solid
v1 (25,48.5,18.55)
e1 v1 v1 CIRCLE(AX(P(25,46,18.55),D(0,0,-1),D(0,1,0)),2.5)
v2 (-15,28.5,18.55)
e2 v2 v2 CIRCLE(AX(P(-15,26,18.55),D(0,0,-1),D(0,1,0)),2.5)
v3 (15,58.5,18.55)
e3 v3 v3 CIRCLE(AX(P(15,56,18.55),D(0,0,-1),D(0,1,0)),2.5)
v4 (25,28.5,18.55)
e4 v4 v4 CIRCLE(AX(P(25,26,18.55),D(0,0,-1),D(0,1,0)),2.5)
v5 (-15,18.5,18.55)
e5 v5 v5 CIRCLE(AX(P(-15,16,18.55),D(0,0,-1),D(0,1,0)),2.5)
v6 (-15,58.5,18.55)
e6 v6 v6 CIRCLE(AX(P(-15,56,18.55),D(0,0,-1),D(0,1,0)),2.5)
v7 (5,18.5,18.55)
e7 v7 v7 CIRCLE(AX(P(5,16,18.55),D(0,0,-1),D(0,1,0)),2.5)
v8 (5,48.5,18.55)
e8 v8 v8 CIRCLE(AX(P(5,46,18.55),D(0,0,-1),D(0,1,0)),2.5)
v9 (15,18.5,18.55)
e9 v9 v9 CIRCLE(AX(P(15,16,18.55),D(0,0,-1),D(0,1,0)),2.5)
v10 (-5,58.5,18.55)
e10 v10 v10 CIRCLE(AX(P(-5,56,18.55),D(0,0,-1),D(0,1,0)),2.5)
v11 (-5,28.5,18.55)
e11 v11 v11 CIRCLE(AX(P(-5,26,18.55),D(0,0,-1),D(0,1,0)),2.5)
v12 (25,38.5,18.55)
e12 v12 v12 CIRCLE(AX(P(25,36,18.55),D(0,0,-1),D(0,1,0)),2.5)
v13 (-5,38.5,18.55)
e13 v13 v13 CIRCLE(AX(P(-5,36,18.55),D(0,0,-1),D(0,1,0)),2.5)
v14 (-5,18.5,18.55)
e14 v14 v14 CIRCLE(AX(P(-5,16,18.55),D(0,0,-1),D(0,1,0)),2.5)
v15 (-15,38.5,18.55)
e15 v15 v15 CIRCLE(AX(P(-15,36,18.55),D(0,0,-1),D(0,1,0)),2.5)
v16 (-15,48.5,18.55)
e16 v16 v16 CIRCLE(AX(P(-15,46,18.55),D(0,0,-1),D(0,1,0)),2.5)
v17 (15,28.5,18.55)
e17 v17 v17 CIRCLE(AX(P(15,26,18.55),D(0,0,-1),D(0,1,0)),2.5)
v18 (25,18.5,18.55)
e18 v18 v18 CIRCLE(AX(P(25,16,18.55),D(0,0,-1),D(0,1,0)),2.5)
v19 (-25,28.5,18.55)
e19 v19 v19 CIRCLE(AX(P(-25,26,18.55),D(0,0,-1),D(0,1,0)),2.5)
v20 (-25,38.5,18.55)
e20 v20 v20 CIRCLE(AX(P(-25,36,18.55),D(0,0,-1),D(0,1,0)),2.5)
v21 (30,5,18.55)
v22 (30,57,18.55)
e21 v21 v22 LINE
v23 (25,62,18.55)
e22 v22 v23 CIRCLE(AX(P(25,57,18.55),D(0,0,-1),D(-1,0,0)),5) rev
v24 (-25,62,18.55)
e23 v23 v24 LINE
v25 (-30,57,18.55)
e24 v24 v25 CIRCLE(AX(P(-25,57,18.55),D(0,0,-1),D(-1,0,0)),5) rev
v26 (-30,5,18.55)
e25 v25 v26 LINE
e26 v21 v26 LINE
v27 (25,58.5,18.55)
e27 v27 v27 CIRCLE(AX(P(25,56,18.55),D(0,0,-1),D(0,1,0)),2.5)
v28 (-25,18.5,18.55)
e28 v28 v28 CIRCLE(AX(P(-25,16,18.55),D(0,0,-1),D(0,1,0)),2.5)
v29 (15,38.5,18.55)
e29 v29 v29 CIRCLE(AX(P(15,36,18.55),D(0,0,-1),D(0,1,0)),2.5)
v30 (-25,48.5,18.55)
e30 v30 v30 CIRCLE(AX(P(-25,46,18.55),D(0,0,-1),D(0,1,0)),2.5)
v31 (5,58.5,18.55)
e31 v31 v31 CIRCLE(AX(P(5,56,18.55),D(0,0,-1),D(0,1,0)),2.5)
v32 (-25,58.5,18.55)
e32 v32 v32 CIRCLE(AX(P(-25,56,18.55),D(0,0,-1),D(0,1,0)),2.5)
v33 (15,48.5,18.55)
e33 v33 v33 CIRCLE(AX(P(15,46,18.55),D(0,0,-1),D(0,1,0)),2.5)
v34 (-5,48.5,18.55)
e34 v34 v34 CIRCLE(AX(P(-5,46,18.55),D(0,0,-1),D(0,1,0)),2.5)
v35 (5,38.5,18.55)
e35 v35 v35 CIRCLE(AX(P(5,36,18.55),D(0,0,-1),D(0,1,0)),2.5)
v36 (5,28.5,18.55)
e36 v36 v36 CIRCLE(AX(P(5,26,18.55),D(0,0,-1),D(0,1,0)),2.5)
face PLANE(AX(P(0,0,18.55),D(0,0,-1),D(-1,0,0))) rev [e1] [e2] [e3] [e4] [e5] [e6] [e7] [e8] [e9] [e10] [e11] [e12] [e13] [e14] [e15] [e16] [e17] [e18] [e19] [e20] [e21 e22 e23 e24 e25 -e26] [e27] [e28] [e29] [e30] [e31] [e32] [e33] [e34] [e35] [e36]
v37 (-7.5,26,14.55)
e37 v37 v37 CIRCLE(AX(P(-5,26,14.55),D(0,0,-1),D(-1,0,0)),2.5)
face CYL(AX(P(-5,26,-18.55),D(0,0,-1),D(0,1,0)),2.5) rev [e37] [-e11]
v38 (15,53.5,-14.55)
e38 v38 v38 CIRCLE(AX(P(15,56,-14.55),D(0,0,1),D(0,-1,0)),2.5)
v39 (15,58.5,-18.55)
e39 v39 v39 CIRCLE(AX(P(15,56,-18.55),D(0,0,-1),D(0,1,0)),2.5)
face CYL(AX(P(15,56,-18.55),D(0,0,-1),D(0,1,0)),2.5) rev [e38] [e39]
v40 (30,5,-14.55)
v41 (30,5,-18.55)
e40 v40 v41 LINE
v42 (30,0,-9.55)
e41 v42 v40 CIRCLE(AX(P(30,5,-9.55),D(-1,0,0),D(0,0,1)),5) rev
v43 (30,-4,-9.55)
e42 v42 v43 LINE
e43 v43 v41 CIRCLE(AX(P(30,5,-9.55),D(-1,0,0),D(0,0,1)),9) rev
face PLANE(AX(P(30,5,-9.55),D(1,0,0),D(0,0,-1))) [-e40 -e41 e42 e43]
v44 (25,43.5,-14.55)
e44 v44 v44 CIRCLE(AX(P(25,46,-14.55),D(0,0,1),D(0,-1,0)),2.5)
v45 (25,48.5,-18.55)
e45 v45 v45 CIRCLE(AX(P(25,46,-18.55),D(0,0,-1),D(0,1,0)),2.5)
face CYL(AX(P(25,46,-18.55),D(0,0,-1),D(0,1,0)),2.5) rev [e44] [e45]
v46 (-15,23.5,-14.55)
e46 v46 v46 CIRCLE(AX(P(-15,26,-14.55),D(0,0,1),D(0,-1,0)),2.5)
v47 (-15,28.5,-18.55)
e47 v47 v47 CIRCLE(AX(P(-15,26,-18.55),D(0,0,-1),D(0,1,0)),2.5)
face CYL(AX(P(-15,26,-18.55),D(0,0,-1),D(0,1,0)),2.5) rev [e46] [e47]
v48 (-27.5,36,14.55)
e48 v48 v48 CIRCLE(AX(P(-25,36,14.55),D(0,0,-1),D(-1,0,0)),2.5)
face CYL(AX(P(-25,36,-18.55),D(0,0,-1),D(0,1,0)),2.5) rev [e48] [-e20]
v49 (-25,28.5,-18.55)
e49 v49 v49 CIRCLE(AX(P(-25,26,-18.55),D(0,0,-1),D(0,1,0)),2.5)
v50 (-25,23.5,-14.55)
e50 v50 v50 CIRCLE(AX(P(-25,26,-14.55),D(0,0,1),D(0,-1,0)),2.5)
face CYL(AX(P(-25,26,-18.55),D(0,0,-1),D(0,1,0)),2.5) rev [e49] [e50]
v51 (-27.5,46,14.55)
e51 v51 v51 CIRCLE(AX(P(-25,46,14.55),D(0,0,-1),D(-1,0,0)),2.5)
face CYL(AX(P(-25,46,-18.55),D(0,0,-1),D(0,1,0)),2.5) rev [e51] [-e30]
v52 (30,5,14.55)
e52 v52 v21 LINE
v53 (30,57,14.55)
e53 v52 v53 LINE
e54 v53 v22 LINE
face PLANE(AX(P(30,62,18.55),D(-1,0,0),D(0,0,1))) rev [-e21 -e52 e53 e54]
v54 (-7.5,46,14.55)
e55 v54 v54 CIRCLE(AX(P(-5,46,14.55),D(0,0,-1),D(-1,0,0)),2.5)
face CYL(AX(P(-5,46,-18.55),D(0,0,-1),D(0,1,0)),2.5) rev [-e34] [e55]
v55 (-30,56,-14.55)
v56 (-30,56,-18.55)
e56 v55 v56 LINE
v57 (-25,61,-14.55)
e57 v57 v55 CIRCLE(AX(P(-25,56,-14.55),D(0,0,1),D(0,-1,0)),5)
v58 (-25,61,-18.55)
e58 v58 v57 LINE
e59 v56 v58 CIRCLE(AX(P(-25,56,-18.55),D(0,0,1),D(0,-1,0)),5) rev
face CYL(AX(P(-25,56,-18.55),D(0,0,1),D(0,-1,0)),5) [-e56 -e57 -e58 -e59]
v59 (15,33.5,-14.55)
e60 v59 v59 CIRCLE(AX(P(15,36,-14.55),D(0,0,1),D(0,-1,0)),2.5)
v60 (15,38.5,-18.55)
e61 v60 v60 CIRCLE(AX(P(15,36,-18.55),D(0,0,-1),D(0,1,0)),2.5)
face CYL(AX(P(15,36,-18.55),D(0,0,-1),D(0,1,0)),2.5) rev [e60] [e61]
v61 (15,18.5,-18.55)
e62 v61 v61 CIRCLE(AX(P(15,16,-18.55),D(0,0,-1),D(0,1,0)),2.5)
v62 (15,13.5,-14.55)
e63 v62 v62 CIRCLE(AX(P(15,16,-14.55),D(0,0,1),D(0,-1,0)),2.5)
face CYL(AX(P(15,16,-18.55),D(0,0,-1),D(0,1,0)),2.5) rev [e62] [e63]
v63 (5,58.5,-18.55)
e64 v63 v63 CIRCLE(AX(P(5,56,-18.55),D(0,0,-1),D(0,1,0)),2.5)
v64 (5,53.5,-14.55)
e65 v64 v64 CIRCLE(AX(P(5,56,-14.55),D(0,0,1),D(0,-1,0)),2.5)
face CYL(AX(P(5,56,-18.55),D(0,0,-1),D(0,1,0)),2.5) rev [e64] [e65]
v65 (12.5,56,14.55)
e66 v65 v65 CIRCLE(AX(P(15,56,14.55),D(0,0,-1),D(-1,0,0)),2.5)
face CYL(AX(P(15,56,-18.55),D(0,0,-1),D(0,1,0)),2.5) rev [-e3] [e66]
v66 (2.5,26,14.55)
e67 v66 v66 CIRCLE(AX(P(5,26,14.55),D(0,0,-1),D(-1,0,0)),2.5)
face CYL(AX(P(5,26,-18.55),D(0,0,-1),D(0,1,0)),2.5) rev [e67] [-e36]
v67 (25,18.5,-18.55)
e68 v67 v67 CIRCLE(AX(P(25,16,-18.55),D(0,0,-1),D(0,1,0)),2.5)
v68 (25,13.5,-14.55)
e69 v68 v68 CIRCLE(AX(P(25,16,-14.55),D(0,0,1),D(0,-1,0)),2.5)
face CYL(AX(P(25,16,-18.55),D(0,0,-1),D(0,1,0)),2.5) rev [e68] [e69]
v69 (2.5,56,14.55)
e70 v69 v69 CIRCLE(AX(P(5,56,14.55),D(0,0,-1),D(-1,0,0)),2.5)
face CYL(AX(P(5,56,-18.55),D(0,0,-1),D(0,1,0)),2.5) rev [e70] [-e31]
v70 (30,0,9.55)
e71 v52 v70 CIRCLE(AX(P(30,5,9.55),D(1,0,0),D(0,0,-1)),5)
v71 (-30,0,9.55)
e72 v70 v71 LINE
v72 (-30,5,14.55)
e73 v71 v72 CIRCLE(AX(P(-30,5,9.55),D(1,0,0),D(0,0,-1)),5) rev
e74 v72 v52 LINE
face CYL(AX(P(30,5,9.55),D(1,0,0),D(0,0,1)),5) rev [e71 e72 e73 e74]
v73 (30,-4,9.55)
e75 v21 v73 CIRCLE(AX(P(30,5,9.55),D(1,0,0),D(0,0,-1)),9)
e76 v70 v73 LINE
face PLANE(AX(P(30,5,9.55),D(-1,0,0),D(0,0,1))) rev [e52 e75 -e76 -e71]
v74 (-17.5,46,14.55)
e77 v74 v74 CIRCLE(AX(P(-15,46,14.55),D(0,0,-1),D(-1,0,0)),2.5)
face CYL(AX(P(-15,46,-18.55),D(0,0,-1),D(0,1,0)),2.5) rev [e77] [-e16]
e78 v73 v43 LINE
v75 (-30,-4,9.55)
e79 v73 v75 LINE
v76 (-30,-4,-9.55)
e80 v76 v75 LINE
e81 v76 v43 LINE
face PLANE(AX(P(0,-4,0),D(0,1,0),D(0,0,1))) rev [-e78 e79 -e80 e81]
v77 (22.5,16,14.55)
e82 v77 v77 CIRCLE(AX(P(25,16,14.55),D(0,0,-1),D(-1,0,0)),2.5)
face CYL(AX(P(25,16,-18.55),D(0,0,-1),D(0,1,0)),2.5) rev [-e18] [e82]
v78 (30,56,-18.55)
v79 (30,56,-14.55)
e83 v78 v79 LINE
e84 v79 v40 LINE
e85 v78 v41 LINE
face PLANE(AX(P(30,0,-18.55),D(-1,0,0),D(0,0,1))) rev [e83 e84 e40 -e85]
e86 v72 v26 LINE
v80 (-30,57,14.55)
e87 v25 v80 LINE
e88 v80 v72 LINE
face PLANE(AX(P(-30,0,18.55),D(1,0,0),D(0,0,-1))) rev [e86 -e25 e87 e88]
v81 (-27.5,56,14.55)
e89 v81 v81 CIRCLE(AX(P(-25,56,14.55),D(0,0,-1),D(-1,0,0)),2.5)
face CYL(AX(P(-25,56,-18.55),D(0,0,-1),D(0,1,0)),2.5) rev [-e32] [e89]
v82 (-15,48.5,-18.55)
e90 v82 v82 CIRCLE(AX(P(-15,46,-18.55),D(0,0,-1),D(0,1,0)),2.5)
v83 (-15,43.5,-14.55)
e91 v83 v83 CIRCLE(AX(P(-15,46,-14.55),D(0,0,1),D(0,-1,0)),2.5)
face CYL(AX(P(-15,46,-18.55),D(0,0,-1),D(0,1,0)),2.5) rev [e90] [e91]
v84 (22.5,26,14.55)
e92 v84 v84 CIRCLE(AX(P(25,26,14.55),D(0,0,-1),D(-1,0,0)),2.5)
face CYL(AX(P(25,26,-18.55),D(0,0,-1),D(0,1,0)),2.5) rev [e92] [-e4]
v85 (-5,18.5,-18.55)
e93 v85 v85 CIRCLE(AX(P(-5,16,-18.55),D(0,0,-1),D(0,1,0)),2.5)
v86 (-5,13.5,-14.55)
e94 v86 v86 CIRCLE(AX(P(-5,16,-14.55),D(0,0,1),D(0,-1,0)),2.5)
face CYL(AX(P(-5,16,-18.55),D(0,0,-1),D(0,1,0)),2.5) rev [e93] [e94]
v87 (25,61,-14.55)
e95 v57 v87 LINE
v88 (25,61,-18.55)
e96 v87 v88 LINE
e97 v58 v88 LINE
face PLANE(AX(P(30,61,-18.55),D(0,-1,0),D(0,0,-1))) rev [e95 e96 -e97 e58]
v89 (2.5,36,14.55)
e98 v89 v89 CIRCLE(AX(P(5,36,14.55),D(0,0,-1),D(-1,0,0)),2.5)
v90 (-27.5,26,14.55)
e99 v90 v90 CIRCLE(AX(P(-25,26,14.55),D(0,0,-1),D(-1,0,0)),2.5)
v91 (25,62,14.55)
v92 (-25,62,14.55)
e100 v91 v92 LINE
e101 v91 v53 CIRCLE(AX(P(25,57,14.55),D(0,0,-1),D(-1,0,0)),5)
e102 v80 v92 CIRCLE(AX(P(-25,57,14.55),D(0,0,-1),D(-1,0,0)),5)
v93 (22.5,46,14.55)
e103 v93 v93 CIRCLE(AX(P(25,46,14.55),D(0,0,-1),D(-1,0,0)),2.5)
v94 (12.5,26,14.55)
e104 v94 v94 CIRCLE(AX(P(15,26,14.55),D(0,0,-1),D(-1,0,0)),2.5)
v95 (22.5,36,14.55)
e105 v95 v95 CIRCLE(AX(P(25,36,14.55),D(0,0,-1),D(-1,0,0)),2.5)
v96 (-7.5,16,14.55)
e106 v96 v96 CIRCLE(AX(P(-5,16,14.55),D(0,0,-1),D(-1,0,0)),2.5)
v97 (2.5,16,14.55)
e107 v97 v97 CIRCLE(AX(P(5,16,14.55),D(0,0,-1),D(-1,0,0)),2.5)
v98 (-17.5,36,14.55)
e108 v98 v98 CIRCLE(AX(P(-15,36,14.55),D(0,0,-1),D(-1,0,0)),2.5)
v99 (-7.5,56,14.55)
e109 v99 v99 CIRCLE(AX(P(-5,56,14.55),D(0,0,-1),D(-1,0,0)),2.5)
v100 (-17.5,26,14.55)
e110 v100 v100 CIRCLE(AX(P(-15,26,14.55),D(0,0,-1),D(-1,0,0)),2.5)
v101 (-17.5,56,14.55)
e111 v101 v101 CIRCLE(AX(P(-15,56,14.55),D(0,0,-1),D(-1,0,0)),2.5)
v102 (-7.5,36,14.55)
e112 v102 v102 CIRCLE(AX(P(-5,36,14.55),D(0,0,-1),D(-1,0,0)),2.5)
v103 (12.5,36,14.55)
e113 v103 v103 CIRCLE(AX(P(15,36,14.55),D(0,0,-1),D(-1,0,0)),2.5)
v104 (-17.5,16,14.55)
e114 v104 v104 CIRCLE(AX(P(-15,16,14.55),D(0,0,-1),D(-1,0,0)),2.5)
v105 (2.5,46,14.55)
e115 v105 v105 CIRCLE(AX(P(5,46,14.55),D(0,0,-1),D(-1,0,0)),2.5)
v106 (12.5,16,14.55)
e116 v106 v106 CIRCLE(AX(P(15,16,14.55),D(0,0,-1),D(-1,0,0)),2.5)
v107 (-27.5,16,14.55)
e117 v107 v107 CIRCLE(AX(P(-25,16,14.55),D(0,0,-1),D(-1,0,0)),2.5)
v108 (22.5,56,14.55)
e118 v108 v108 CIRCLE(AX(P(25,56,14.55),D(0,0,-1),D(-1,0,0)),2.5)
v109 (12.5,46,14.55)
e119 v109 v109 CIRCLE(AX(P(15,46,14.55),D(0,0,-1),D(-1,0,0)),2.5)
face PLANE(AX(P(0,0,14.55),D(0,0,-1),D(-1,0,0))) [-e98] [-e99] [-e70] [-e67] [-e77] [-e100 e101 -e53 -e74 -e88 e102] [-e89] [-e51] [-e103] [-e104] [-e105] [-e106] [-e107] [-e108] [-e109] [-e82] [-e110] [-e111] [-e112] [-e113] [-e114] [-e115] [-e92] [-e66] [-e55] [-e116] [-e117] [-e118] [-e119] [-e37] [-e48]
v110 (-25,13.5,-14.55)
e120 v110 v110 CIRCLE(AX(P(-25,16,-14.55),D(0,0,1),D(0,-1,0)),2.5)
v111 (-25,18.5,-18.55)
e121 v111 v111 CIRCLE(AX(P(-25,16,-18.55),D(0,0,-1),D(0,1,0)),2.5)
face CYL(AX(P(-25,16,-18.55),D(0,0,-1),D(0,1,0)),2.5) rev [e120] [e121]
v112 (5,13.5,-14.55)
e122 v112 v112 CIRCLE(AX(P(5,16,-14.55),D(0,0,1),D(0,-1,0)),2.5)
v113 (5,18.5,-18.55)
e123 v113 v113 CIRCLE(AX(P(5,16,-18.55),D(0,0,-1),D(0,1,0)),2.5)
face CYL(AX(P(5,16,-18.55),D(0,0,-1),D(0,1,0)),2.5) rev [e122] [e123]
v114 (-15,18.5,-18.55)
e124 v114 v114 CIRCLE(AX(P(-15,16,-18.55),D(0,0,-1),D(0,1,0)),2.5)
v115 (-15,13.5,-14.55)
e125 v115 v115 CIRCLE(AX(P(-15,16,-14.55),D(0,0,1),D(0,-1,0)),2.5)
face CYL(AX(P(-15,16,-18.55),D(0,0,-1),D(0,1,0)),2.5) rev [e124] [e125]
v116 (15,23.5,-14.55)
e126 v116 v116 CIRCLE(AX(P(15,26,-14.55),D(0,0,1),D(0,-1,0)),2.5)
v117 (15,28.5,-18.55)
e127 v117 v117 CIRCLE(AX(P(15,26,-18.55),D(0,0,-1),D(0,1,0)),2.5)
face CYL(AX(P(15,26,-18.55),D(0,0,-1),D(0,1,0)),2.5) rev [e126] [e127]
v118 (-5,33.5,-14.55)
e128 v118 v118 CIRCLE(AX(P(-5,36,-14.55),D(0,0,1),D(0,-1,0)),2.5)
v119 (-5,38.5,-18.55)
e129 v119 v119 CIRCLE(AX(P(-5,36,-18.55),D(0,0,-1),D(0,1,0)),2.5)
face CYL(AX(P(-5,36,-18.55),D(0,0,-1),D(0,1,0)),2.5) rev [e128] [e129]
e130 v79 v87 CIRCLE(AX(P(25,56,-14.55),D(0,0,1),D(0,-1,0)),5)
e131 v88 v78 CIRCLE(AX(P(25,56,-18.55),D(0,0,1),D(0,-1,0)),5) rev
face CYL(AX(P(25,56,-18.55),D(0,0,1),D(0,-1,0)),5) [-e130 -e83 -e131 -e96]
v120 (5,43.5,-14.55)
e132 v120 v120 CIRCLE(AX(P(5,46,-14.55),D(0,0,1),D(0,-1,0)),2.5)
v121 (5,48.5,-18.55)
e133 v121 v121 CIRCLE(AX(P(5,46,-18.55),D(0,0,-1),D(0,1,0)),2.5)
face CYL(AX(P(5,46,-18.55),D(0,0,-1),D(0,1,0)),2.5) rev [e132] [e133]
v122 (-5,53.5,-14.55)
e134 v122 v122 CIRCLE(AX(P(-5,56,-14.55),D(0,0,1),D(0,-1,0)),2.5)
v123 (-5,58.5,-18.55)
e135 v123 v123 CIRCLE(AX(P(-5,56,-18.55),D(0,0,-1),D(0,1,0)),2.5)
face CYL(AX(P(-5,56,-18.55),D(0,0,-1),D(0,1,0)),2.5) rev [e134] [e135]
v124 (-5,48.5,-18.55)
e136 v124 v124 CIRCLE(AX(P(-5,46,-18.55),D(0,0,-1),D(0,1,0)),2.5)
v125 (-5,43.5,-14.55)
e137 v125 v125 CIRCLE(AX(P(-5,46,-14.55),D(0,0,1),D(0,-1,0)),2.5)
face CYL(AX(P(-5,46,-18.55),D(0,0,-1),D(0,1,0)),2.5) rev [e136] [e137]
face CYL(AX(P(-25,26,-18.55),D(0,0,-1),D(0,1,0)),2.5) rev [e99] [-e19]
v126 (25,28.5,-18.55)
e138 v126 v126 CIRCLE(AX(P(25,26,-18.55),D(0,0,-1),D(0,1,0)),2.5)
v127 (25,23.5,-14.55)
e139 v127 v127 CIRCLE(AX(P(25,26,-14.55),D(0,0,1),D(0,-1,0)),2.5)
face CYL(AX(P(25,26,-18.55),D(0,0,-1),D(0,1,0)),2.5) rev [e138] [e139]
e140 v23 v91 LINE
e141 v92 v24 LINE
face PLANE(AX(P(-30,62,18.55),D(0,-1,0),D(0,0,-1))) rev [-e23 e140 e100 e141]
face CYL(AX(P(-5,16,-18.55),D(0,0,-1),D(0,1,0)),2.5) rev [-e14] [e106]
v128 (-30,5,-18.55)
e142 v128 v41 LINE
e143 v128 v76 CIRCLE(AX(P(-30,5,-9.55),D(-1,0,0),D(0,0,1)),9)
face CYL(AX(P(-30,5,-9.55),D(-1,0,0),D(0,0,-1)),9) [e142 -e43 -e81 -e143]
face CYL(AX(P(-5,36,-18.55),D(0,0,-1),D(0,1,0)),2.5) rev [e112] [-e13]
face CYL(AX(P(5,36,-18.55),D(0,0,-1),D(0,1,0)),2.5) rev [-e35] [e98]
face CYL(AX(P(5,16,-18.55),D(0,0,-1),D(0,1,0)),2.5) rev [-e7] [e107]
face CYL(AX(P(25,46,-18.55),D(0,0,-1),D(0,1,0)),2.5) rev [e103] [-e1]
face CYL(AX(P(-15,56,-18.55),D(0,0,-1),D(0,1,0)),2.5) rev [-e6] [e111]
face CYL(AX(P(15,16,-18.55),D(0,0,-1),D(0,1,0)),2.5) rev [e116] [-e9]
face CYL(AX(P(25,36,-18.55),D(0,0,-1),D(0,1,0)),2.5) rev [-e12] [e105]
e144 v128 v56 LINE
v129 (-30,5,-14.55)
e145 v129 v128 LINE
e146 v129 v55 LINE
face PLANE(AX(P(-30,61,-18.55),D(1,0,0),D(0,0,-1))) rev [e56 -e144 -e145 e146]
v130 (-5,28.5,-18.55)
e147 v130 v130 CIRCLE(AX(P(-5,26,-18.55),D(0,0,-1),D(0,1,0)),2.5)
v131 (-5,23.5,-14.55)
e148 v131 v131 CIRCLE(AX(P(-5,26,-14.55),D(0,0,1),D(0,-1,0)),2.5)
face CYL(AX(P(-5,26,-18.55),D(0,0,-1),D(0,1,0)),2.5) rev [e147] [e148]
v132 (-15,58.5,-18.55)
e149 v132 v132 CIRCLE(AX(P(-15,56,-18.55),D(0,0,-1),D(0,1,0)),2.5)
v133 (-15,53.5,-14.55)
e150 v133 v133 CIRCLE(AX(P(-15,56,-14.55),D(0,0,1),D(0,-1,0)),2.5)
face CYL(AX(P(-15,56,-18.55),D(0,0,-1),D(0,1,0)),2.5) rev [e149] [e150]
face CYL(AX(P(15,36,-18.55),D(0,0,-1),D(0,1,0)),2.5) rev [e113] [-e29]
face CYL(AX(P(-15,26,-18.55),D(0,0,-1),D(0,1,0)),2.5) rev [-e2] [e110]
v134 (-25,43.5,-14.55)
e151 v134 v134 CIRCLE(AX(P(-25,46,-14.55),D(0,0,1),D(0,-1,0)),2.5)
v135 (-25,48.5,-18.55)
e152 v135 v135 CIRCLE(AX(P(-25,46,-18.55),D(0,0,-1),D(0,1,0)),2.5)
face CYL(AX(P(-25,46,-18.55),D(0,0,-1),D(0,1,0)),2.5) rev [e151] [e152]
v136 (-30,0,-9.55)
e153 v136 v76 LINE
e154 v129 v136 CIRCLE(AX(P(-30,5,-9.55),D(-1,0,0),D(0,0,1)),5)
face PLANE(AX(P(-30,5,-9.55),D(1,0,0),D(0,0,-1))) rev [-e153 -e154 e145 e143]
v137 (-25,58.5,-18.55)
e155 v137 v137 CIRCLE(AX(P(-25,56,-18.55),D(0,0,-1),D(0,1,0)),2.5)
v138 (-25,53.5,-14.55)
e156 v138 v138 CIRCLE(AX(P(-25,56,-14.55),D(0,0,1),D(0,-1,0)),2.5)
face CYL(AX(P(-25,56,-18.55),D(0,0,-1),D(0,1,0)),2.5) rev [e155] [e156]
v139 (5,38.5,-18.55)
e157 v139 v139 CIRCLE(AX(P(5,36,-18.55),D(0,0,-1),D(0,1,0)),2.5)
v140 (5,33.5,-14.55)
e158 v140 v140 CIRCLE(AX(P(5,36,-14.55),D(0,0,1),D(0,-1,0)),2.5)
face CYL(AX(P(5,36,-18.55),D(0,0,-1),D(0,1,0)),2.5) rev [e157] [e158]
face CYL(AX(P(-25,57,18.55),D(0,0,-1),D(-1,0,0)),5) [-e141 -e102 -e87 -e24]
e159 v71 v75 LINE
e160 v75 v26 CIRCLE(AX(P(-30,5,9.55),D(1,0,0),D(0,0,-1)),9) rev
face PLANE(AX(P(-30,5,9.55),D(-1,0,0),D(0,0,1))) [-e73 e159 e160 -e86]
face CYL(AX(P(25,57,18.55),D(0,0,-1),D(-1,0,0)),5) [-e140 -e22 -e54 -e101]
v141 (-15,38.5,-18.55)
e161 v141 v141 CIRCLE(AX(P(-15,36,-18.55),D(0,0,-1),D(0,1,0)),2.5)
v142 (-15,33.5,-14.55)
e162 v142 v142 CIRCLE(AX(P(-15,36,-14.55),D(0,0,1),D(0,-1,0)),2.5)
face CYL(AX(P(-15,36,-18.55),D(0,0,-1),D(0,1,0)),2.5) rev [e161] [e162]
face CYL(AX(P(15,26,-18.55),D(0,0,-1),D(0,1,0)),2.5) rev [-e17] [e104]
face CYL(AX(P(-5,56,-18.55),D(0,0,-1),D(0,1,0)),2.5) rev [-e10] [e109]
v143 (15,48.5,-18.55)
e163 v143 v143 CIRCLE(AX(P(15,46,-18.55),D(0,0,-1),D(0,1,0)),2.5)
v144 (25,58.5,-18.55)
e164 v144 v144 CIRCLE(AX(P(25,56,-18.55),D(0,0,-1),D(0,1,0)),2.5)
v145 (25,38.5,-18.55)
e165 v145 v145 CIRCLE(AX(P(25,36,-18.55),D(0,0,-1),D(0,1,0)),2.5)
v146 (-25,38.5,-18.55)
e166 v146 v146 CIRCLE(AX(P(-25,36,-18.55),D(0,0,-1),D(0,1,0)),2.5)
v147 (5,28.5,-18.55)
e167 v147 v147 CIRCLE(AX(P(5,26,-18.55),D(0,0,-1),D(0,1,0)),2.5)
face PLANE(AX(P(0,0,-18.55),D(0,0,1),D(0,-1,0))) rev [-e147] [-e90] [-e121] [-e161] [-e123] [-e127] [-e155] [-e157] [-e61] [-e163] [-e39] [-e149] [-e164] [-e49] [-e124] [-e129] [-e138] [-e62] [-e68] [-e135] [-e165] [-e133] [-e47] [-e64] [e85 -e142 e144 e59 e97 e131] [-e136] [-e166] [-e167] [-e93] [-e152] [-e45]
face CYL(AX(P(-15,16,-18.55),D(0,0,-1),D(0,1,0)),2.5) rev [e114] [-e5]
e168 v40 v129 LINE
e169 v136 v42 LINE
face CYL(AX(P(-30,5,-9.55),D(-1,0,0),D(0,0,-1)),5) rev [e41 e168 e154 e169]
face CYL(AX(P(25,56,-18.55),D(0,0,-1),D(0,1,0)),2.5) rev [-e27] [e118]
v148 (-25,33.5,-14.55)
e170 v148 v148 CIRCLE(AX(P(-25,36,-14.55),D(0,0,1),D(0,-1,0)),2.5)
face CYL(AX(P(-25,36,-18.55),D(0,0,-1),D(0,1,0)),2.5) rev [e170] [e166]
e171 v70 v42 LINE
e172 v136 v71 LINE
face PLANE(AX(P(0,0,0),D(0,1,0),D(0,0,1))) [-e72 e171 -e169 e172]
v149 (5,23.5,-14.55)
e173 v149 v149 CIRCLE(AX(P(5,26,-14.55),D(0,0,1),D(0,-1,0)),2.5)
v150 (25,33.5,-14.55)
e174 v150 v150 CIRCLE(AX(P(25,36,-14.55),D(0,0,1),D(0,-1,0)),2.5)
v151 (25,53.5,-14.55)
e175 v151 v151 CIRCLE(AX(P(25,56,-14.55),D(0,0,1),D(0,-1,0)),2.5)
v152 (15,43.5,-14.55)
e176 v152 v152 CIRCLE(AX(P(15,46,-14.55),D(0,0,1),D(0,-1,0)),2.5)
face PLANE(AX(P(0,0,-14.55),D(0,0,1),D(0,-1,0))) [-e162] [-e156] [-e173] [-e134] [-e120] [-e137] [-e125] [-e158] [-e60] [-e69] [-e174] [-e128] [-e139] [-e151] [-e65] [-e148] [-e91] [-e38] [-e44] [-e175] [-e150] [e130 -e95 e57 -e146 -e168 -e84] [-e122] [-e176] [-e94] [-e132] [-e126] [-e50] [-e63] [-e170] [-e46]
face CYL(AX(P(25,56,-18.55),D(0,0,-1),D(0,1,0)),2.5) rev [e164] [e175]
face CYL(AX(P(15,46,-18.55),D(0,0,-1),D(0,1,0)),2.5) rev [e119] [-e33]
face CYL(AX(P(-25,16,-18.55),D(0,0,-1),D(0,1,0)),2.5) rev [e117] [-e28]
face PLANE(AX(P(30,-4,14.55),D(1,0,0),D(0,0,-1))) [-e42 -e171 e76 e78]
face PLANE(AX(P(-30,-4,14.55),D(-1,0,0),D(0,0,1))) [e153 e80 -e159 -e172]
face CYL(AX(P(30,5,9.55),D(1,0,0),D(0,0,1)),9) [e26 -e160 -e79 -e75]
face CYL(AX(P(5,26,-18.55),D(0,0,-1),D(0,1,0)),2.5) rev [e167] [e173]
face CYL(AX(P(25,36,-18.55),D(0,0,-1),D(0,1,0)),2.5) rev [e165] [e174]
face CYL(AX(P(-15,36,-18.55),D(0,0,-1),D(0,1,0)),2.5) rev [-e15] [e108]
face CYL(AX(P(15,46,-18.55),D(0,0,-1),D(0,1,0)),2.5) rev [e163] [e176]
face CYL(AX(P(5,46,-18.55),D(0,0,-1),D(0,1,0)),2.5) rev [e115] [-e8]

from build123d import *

# Parameters (mm, degrees)
SKETCH2_W                    = 60
SKETCH2_H                    = 29.1
BASE_FLANGE1_DEPTH           = 4
EDGE_FLANGE1_STRIP_W         = 26
EDGE_FLANGE1_STRIP_H         = 4
EDGE_FLANGE1_STRIP_CUT_DEPTH = 60
EDGE_FLANGE1_DEPTH           = 60
EDGE_FLANGE2_STRIP_W         = 26
EDGE_FLANGE2_STRIP_H         = 4
EDGE_FLANGE2_STRIP_CUT_DEPTH = 60
EDGE_FLANGE2_DEPTH           = 60
F_1_0MM_DOWEL_HOLE1_D        = 5
LPATTERN1_COUNT              = 6
LPATTERN1_PITCH              = 10
LPATTERN1_COUNT_DIR2         = 5
LPATTERN1_PITCH_DIR2         = 10
FILLET1_R                    = 5


# Sheet-metal steps are written as plain solids
with BuildPart() as part:
    # Sketch2 → Base-Flange1 (new body)
    with BuildSketch(Plane(origin=(0, 0, 0), x_dir=(1, 0, 0), z_dir=(0, 1, 0))):
        Rectangle(SKETCH2_W, SKETCH2_H)
    extrude(amount=-BASE_FLANGE1_DEPTH)

    # Edge-Flange1 strip (across the edge) → Edge-Flange1 strip cut (cut)
    with BuildSketch(Plane(origin=(-30, 0, 14.55), x_dir=(0, 0, -1), z_dir=(1, 0, 0))):
        with Locations((-8, -2)):
            Rectangle(EDGE_FLANGE1_STRIP_W, EDGE_FLANGE1_STRIP_H)
    extrude(amount=EDGE_FLANGE1_STRIP_CUT_DEPTH, mode=Mode.SUBTRACT)

    # Edge-Flange1 section (across the edge) → Edge-Flange1 (add)
    with BuildSketch(Plane(origin=(-30, 0, 14.55), x_dir=(0, 0, -1), z_dir=(1, 0, 0))):
        with BuildLine():
            Line((-4, 5), (-4, 62))
            Line((-4, 62), (0, 62))
            Line((0, 62), (0, 5))
            ThreePointArc((0, 5), (1.464466094, 1.464466094), (5, 0))
            Line((5, 0), (5, -4))
            ThreePointArc((5, -4), (-1.363961031, -1.363961031), (-4, 5))
        make_face()
    extrude(amount=EDGE_FLANGE1_DEPTH)

    # Edge-Flange2 strip (across the edge) → Edge-Flange2 strip cut (cut)
    with BuildSketch(Plane(origin=(30, 0, -14.55), x_dir=(0, 0, 1), z_dir=(-1, 0, 0))):
        with Locations((-8, -2)):
            Rectangle(EDGE_FLANGE2_STRIP_W, EDGE_FLANGE2_STRIP_H)
    extrude(amount=EDGE_FLANGE2_STRIP_CUT_DEPTH, mode=Mode.SUBTRACT)

    # Edge-Flange2 section (across the edge) → Edge-Flange2 (add)
    with BuildSketch(Plane(origin=(30, 0, -14.55), x_dir=(0, 0, 1), z_dir=(-1, 0, 0))):
        with BuildLine():
            Line((-4, 5), (-4, 61))
            Line((-4, 61), (0, 61))
            Line((0, 61), (0, 5))
            ThreePointArc((0, 5), (1.464466094, 1.464466094), (5, 0))
            Line((5, 0), (5, -4))
            ThreePointArc((5, -4), (-1.363961031, -1.363961031), (-4, 5))
        make_face()
    extrude(amount=EDGE_FLANGE2_DEPTH)

    # Ø1.0mm Dowel Hole1 (through all)
    with Locations(Plane(origin=(0, 0, -18.55), x_dir=(-1, 0, 0), z_dir=(0, 0, -1))):
        with Locations((-25, 56)):
            f_1_0mm_dowel_hole1 = Hole(F_1_0MM_DOWEL_HOLE1_D / 2)

    # LPattern1: 1.0mm Dowel Hole1 6 × 5
    with Locations(*[(-i * LPATTERN1_PITCH, -j * LPATTERN1_PITCH_DIR2, 0) for i in range(LPATTERN1_COUNT) for j in range(LPATTERN1_COUNT_DIR2) if (i, j) != (0, 0)]):
        add(f_1_0mm_dowel_hole1, mode=Mode.SUBTRACT)

    # Fillet1
    fillet1_edges = [part.edges().sort_by_distance(p)[0] for p in [
        (-30, 62, 16.55),
        (30, 62, 16.55),
        (30, 61, -16.55),
        (-30, 61, -16.55),
    ]]
    fillet(fillet1_edges, radius=FILLET1_R)


solid = part.part
